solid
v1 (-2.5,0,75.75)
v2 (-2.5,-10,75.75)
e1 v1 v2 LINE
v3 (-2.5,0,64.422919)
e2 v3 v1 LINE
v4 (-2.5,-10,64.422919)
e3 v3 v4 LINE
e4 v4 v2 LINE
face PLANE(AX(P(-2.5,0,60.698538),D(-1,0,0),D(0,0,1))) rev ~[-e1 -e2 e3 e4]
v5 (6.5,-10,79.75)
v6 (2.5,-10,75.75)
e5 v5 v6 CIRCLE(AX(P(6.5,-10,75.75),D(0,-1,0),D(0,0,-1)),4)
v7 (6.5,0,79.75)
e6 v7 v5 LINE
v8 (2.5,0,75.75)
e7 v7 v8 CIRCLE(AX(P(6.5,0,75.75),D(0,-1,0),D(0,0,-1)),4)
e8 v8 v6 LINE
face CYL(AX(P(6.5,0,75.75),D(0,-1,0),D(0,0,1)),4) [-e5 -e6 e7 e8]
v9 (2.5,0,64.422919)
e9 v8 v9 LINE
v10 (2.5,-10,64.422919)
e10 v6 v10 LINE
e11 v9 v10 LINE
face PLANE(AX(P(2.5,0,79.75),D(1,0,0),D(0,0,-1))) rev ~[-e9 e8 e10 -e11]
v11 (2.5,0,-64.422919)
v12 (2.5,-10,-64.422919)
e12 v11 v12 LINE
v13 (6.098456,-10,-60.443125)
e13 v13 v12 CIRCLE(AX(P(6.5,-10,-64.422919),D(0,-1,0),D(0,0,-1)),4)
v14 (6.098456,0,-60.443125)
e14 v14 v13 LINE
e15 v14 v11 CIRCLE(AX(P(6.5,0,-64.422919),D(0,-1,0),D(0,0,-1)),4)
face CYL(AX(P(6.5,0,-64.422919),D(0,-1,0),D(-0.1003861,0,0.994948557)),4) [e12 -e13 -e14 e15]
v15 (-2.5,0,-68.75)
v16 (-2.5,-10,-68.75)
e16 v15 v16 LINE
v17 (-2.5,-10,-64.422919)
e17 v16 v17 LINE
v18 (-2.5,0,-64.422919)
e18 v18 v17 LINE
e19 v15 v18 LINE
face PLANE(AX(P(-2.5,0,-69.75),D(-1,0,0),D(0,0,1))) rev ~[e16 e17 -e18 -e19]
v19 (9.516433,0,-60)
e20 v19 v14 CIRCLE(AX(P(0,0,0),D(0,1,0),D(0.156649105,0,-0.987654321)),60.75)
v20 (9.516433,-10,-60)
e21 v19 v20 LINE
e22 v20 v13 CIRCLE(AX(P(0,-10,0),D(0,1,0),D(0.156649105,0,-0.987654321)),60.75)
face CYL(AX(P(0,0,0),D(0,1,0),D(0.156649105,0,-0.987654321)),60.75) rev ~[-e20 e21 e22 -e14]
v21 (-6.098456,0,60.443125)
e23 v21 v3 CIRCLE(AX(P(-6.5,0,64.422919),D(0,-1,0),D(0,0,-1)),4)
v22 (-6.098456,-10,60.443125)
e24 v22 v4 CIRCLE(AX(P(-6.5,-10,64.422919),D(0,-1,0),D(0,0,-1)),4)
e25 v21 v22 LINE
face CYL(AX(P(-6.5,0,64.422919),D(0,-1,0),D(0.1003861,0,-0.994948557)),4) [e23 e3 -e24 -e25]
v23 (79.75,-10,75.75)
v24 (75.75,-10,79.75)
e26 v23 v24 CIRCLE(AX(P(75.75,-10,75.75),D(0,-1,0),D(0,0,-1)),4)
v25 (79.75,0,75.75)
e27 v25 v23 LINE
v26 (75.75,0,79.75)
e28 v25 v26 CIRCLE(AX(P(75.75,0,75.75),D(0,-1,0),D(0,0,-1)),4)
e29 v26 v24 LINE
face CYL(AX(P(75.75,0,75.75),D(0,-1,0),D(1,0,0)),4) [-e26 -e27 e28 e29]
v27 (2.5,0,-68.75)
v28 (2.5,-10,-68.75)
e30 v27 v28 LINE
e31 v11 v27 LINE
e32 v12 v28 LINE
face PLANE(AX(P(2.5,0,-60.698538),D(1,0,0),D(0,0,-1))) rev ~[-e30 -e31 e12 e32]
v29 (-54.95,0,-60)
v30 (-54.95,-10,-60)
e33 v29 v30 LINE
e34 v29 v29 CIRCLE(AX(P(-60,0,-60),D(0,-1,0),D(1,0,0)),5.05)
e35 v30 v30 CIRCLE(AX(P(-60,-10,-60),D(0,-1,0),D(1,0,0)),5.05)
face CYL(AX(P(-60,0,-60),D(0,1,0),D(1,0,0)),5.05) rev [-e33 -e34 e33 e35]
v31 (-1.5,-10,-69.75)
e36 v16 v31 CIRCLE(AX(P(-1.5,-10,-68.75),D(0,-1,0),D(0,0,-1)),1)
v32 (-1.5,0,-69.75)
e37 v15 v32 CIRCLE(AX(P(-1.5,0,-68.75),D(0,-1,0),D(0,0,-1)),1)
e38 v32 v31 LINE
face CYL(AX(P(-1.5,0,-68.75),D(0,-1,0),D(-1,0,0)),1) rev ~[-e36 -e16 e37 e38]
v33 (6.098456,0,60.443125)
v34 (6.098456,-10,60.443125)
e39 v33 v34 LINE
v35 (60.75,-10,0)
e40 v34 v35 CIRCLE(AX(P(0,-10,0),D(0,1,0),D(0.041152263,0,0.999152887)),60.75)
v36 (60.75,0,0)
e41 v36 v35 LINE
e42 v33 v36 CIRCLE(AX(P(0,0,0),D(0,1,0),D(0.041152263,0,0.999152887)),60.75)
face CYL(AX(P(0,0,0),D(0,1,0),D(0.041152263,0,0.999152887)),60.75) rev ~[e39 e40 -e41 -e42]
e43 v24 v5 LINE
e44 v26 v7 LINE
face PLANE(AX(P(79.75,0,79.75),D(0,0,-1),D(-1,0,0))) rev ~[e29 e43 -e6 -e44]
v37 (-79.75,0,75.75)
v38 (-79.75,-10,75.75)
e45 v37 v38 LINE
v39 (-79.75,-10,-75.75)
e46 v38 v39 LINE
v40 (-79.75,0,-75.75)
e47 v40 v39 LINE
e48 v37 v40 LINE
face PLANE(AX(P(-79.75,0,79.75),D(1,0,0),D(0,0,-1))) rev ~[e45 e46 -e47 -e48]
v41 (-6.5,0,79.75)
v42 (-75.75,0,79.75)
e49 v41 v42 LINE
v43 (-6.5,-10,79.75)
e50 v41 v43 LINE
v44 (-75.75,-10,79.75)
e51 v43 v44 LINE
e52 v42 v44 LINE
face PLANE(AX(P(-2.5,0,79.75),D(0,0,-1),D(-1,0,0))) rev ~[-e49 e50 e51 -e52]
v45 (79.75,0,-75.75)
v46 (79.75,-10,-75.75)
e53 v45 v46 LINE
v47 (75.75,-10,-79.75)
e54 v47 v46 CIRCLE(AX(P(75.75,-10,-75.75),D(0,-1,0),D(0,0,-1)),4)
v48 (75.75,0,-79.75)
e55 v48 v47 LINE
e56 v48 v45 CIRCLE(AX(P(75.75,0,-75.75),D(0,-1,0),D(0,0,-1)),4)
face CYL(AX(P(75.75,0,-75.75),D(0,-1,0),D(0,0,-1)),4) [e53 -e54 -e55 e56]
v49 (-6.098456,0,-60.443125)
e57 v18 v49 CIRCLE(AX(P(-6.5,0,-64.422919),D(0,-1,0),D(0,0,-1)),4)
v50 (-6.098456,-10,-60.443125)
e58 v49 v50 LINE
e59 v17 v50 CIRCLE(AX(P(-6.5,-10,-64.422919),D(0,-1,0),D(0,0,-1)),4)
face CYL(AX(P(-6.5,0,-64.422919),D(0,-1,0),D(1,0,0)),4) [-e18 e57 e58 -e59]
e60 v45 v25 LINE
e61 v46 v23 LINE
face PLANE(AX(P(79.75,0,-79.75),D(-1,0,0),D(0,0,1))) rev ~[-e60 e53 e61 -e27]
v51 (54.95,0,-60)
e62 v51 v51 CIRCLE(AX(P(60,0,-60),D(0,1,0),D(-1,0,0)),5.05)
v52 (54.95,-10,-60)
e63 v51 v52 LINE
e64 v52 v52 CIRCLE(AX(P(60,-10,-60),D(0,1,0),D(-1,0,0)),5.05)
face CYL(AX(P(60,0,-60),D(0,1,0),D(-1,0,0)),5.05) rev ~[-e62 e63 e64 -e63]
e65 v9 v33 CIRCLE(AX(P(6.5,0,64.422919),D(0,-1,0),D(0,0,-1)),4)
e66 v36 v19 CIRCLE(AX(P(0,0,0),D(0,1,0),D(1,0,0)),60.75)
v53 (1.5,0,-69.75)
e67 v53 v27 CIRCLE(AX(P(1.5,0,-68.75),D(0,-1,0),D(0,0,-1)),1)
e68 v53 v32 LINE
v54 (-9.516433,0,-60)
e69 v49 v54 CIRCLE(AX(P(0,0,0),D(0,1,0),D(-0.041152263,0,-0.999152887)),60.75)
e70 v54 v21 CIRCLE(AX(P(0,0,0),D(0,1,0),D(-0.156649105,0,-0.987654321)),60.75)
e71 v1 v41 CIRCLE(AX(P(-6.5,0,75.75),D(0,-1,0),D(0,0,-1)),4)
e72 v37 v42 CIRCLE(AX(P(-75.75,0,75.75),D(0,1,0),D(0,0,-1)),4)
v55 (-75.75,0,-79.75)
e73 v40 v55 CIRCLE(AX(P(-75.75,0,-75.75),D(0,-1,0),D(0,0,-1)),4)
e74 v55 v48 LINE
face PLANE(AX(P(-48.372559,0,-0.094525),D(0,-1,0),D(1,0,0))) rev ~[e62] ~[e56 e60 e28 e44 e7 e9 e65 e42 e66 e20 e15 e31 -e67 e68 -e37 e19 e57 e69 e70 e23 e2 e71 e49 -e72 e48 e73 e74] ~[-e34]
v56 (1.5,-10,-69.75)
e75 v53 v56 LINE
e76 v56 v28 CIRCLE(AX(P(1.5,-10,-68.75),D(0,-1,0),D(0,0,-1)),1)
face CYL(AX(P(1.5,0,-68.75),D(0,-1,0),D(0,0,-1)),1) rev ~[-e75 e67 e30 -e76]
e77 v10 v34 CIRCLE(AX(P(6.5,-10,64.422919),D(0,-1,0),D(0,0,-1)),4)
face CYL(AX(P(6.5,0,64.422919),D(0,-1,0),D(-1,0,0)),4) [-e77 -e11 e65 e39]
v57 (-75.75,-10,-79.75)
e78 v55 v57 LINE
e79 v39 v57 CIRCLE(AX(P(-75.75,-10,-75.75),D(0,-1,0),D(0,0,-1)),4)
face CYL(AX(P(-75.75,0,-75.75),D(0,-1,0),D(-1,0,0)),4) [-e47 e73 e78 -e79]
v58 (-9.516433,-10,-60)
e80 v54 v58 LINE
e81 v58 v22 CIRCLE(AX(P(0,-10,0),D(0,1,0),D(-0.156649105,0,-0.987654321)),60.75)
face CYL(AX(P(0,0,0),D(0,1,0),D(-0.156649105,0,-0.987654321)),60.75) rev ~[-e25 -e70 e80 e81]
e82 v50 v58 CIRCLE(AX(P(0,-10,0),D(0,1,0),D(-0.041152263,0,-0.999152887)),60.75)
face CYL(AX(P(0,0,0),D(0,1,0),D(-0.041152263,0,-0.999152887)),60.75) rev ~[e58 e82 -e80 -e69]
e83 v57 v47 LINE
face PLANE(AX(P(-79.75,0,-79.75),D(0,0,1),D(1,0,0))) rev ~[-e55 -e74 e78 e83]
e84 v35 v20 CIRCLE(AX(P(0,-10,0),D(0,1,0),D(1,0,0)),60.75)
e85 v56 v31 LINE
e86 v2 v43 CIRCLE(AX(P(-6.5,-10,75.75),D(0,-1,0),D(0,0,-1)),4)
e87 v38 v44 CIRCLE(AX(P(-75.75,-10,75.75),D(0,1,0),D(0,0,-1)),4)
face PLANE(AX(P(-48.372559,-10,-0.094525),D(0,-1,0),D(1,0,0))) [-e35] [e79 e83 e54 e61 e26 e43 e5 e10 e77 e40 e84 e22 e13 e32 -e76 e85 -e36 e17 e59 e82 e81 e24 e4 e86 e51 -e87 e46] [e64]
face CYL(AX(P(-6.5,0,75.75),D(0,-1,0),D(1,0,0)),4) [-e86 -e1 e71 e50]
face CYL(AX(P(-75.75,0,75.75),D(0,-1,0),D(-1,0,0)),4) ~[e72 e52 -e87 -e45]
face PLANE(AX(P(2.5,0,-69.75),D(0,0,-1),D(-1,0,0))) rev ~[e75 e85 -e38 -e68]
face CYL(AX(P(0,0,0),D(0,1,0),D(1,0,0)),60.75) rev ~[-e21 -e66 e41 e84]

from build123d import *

# Parameters (mm, degrees)
F0_R     = 5.05
F0_W     = 2.5
F0_H     = 10
F1_DEPTH = 10
F2_R     = 4
F3_R     = 1


# Not quite as in the source:
# - a feature names something its author has since deleted; it is built from what else it names


with BuildPart() as f1:
    # F0 (on Front) → F1 (new body)
    with BuildSketch(Plane.XZ):
        with BuildLine():
            Line((-79.75, 79.75), (-79.75, -79.75))
            Line((-79.75, -79.75), (-2.5, -79.75))
            Line((-2.5, -79.75), (-2.5, -69.75))
            Line((-2.5, -69.75), (-2.5, -60.6985378737))
            ThreePointArc((-2.5, -60.6985378737), (-6.0183598459, -60.4511525512), (-9.5164331553, -60))
            ThreePointArc((-9.5164331553, -60), (-60.6476127119, 3.5255598628), (-2.5, 60.6985378737))
            Line((-2.5, 60.6985378737), (-2.5, 79.75))
            Line((-2.5, 79.75), (-79.75, 79.75))
        make_face()
        with Locations((-60, -60)):
            Circle(F0_R, mode=Mode.SUBTRACT)
        with BuildLine():
            Line((2.5, -69.75), (2.5, -79.75))
            Line((2.5, -79.75), (79.75, -79.75))
            Line((79.75, -79.75), (79.75, 79.75))
            Line((79.75, 79.75), (2.5, 79.75))
            Line((2.5, 79.75), (2.5, 60.6985378737))
            ThreePointArc((2.5, 60.6985378737), (43.8317094123, 42.0635679656), (60.75, 0))
            ThreePointArc((60.75, 0), (46.198949199, -39.448949199), (9.5164331553, -60))
            ThreePointArc((9.5164331553, -60), (6.0183598459, -60.4511525512), (2.5, -60.6985378737))
            Line((2.5, -60.6985378737), (2.5, -69.75))
        make_face()
        with BuildLine():
            ThreePointArc((65.05, -60), (60, -65.05), (54.95, -60))
            ThreePointArc((54.95, -60), (60, -54.95), (65.05, -60))
        make_face(mode=Mode.SUBTRACT)
        with Locations((-1.25, -74.75)):
            Rectangle(F0_W, F0_H)
        with Locations((1.25, -74.75)):
            Rectangle(F0_W, F0_H)
    extrude(amount=F1_DEPTH)

    # F2
    f2_edges = [f1.edges().sort_by_distance(p)[0] for p in [
        (79.75, -5, 79.75),
        (-79.75, -5, 79.75),
        (-79.75, -5, -79.75),
        (79.75, -5, -79.75),
        (-2.5, -5, 60.698538),
        (-2.5, -5, 79.75),
        (2.5, -5, 79.75),
        (2.5, -5, 60.698538),
        (2.5, -5, -60.698538),
        (-2.5, -5, -60.698538),
    ]]
    fillet(f2_edges, radius=F2_R)

    # F3
    f3_edges = [f1.edges().sort_by_distance(p)[0] for p in [
        (-2.5, -5, -69.75),
        (2.5, -5, -69.75),
    ]]
    fillet(f3_edges, radius=F3_R)


solid = f1.part
